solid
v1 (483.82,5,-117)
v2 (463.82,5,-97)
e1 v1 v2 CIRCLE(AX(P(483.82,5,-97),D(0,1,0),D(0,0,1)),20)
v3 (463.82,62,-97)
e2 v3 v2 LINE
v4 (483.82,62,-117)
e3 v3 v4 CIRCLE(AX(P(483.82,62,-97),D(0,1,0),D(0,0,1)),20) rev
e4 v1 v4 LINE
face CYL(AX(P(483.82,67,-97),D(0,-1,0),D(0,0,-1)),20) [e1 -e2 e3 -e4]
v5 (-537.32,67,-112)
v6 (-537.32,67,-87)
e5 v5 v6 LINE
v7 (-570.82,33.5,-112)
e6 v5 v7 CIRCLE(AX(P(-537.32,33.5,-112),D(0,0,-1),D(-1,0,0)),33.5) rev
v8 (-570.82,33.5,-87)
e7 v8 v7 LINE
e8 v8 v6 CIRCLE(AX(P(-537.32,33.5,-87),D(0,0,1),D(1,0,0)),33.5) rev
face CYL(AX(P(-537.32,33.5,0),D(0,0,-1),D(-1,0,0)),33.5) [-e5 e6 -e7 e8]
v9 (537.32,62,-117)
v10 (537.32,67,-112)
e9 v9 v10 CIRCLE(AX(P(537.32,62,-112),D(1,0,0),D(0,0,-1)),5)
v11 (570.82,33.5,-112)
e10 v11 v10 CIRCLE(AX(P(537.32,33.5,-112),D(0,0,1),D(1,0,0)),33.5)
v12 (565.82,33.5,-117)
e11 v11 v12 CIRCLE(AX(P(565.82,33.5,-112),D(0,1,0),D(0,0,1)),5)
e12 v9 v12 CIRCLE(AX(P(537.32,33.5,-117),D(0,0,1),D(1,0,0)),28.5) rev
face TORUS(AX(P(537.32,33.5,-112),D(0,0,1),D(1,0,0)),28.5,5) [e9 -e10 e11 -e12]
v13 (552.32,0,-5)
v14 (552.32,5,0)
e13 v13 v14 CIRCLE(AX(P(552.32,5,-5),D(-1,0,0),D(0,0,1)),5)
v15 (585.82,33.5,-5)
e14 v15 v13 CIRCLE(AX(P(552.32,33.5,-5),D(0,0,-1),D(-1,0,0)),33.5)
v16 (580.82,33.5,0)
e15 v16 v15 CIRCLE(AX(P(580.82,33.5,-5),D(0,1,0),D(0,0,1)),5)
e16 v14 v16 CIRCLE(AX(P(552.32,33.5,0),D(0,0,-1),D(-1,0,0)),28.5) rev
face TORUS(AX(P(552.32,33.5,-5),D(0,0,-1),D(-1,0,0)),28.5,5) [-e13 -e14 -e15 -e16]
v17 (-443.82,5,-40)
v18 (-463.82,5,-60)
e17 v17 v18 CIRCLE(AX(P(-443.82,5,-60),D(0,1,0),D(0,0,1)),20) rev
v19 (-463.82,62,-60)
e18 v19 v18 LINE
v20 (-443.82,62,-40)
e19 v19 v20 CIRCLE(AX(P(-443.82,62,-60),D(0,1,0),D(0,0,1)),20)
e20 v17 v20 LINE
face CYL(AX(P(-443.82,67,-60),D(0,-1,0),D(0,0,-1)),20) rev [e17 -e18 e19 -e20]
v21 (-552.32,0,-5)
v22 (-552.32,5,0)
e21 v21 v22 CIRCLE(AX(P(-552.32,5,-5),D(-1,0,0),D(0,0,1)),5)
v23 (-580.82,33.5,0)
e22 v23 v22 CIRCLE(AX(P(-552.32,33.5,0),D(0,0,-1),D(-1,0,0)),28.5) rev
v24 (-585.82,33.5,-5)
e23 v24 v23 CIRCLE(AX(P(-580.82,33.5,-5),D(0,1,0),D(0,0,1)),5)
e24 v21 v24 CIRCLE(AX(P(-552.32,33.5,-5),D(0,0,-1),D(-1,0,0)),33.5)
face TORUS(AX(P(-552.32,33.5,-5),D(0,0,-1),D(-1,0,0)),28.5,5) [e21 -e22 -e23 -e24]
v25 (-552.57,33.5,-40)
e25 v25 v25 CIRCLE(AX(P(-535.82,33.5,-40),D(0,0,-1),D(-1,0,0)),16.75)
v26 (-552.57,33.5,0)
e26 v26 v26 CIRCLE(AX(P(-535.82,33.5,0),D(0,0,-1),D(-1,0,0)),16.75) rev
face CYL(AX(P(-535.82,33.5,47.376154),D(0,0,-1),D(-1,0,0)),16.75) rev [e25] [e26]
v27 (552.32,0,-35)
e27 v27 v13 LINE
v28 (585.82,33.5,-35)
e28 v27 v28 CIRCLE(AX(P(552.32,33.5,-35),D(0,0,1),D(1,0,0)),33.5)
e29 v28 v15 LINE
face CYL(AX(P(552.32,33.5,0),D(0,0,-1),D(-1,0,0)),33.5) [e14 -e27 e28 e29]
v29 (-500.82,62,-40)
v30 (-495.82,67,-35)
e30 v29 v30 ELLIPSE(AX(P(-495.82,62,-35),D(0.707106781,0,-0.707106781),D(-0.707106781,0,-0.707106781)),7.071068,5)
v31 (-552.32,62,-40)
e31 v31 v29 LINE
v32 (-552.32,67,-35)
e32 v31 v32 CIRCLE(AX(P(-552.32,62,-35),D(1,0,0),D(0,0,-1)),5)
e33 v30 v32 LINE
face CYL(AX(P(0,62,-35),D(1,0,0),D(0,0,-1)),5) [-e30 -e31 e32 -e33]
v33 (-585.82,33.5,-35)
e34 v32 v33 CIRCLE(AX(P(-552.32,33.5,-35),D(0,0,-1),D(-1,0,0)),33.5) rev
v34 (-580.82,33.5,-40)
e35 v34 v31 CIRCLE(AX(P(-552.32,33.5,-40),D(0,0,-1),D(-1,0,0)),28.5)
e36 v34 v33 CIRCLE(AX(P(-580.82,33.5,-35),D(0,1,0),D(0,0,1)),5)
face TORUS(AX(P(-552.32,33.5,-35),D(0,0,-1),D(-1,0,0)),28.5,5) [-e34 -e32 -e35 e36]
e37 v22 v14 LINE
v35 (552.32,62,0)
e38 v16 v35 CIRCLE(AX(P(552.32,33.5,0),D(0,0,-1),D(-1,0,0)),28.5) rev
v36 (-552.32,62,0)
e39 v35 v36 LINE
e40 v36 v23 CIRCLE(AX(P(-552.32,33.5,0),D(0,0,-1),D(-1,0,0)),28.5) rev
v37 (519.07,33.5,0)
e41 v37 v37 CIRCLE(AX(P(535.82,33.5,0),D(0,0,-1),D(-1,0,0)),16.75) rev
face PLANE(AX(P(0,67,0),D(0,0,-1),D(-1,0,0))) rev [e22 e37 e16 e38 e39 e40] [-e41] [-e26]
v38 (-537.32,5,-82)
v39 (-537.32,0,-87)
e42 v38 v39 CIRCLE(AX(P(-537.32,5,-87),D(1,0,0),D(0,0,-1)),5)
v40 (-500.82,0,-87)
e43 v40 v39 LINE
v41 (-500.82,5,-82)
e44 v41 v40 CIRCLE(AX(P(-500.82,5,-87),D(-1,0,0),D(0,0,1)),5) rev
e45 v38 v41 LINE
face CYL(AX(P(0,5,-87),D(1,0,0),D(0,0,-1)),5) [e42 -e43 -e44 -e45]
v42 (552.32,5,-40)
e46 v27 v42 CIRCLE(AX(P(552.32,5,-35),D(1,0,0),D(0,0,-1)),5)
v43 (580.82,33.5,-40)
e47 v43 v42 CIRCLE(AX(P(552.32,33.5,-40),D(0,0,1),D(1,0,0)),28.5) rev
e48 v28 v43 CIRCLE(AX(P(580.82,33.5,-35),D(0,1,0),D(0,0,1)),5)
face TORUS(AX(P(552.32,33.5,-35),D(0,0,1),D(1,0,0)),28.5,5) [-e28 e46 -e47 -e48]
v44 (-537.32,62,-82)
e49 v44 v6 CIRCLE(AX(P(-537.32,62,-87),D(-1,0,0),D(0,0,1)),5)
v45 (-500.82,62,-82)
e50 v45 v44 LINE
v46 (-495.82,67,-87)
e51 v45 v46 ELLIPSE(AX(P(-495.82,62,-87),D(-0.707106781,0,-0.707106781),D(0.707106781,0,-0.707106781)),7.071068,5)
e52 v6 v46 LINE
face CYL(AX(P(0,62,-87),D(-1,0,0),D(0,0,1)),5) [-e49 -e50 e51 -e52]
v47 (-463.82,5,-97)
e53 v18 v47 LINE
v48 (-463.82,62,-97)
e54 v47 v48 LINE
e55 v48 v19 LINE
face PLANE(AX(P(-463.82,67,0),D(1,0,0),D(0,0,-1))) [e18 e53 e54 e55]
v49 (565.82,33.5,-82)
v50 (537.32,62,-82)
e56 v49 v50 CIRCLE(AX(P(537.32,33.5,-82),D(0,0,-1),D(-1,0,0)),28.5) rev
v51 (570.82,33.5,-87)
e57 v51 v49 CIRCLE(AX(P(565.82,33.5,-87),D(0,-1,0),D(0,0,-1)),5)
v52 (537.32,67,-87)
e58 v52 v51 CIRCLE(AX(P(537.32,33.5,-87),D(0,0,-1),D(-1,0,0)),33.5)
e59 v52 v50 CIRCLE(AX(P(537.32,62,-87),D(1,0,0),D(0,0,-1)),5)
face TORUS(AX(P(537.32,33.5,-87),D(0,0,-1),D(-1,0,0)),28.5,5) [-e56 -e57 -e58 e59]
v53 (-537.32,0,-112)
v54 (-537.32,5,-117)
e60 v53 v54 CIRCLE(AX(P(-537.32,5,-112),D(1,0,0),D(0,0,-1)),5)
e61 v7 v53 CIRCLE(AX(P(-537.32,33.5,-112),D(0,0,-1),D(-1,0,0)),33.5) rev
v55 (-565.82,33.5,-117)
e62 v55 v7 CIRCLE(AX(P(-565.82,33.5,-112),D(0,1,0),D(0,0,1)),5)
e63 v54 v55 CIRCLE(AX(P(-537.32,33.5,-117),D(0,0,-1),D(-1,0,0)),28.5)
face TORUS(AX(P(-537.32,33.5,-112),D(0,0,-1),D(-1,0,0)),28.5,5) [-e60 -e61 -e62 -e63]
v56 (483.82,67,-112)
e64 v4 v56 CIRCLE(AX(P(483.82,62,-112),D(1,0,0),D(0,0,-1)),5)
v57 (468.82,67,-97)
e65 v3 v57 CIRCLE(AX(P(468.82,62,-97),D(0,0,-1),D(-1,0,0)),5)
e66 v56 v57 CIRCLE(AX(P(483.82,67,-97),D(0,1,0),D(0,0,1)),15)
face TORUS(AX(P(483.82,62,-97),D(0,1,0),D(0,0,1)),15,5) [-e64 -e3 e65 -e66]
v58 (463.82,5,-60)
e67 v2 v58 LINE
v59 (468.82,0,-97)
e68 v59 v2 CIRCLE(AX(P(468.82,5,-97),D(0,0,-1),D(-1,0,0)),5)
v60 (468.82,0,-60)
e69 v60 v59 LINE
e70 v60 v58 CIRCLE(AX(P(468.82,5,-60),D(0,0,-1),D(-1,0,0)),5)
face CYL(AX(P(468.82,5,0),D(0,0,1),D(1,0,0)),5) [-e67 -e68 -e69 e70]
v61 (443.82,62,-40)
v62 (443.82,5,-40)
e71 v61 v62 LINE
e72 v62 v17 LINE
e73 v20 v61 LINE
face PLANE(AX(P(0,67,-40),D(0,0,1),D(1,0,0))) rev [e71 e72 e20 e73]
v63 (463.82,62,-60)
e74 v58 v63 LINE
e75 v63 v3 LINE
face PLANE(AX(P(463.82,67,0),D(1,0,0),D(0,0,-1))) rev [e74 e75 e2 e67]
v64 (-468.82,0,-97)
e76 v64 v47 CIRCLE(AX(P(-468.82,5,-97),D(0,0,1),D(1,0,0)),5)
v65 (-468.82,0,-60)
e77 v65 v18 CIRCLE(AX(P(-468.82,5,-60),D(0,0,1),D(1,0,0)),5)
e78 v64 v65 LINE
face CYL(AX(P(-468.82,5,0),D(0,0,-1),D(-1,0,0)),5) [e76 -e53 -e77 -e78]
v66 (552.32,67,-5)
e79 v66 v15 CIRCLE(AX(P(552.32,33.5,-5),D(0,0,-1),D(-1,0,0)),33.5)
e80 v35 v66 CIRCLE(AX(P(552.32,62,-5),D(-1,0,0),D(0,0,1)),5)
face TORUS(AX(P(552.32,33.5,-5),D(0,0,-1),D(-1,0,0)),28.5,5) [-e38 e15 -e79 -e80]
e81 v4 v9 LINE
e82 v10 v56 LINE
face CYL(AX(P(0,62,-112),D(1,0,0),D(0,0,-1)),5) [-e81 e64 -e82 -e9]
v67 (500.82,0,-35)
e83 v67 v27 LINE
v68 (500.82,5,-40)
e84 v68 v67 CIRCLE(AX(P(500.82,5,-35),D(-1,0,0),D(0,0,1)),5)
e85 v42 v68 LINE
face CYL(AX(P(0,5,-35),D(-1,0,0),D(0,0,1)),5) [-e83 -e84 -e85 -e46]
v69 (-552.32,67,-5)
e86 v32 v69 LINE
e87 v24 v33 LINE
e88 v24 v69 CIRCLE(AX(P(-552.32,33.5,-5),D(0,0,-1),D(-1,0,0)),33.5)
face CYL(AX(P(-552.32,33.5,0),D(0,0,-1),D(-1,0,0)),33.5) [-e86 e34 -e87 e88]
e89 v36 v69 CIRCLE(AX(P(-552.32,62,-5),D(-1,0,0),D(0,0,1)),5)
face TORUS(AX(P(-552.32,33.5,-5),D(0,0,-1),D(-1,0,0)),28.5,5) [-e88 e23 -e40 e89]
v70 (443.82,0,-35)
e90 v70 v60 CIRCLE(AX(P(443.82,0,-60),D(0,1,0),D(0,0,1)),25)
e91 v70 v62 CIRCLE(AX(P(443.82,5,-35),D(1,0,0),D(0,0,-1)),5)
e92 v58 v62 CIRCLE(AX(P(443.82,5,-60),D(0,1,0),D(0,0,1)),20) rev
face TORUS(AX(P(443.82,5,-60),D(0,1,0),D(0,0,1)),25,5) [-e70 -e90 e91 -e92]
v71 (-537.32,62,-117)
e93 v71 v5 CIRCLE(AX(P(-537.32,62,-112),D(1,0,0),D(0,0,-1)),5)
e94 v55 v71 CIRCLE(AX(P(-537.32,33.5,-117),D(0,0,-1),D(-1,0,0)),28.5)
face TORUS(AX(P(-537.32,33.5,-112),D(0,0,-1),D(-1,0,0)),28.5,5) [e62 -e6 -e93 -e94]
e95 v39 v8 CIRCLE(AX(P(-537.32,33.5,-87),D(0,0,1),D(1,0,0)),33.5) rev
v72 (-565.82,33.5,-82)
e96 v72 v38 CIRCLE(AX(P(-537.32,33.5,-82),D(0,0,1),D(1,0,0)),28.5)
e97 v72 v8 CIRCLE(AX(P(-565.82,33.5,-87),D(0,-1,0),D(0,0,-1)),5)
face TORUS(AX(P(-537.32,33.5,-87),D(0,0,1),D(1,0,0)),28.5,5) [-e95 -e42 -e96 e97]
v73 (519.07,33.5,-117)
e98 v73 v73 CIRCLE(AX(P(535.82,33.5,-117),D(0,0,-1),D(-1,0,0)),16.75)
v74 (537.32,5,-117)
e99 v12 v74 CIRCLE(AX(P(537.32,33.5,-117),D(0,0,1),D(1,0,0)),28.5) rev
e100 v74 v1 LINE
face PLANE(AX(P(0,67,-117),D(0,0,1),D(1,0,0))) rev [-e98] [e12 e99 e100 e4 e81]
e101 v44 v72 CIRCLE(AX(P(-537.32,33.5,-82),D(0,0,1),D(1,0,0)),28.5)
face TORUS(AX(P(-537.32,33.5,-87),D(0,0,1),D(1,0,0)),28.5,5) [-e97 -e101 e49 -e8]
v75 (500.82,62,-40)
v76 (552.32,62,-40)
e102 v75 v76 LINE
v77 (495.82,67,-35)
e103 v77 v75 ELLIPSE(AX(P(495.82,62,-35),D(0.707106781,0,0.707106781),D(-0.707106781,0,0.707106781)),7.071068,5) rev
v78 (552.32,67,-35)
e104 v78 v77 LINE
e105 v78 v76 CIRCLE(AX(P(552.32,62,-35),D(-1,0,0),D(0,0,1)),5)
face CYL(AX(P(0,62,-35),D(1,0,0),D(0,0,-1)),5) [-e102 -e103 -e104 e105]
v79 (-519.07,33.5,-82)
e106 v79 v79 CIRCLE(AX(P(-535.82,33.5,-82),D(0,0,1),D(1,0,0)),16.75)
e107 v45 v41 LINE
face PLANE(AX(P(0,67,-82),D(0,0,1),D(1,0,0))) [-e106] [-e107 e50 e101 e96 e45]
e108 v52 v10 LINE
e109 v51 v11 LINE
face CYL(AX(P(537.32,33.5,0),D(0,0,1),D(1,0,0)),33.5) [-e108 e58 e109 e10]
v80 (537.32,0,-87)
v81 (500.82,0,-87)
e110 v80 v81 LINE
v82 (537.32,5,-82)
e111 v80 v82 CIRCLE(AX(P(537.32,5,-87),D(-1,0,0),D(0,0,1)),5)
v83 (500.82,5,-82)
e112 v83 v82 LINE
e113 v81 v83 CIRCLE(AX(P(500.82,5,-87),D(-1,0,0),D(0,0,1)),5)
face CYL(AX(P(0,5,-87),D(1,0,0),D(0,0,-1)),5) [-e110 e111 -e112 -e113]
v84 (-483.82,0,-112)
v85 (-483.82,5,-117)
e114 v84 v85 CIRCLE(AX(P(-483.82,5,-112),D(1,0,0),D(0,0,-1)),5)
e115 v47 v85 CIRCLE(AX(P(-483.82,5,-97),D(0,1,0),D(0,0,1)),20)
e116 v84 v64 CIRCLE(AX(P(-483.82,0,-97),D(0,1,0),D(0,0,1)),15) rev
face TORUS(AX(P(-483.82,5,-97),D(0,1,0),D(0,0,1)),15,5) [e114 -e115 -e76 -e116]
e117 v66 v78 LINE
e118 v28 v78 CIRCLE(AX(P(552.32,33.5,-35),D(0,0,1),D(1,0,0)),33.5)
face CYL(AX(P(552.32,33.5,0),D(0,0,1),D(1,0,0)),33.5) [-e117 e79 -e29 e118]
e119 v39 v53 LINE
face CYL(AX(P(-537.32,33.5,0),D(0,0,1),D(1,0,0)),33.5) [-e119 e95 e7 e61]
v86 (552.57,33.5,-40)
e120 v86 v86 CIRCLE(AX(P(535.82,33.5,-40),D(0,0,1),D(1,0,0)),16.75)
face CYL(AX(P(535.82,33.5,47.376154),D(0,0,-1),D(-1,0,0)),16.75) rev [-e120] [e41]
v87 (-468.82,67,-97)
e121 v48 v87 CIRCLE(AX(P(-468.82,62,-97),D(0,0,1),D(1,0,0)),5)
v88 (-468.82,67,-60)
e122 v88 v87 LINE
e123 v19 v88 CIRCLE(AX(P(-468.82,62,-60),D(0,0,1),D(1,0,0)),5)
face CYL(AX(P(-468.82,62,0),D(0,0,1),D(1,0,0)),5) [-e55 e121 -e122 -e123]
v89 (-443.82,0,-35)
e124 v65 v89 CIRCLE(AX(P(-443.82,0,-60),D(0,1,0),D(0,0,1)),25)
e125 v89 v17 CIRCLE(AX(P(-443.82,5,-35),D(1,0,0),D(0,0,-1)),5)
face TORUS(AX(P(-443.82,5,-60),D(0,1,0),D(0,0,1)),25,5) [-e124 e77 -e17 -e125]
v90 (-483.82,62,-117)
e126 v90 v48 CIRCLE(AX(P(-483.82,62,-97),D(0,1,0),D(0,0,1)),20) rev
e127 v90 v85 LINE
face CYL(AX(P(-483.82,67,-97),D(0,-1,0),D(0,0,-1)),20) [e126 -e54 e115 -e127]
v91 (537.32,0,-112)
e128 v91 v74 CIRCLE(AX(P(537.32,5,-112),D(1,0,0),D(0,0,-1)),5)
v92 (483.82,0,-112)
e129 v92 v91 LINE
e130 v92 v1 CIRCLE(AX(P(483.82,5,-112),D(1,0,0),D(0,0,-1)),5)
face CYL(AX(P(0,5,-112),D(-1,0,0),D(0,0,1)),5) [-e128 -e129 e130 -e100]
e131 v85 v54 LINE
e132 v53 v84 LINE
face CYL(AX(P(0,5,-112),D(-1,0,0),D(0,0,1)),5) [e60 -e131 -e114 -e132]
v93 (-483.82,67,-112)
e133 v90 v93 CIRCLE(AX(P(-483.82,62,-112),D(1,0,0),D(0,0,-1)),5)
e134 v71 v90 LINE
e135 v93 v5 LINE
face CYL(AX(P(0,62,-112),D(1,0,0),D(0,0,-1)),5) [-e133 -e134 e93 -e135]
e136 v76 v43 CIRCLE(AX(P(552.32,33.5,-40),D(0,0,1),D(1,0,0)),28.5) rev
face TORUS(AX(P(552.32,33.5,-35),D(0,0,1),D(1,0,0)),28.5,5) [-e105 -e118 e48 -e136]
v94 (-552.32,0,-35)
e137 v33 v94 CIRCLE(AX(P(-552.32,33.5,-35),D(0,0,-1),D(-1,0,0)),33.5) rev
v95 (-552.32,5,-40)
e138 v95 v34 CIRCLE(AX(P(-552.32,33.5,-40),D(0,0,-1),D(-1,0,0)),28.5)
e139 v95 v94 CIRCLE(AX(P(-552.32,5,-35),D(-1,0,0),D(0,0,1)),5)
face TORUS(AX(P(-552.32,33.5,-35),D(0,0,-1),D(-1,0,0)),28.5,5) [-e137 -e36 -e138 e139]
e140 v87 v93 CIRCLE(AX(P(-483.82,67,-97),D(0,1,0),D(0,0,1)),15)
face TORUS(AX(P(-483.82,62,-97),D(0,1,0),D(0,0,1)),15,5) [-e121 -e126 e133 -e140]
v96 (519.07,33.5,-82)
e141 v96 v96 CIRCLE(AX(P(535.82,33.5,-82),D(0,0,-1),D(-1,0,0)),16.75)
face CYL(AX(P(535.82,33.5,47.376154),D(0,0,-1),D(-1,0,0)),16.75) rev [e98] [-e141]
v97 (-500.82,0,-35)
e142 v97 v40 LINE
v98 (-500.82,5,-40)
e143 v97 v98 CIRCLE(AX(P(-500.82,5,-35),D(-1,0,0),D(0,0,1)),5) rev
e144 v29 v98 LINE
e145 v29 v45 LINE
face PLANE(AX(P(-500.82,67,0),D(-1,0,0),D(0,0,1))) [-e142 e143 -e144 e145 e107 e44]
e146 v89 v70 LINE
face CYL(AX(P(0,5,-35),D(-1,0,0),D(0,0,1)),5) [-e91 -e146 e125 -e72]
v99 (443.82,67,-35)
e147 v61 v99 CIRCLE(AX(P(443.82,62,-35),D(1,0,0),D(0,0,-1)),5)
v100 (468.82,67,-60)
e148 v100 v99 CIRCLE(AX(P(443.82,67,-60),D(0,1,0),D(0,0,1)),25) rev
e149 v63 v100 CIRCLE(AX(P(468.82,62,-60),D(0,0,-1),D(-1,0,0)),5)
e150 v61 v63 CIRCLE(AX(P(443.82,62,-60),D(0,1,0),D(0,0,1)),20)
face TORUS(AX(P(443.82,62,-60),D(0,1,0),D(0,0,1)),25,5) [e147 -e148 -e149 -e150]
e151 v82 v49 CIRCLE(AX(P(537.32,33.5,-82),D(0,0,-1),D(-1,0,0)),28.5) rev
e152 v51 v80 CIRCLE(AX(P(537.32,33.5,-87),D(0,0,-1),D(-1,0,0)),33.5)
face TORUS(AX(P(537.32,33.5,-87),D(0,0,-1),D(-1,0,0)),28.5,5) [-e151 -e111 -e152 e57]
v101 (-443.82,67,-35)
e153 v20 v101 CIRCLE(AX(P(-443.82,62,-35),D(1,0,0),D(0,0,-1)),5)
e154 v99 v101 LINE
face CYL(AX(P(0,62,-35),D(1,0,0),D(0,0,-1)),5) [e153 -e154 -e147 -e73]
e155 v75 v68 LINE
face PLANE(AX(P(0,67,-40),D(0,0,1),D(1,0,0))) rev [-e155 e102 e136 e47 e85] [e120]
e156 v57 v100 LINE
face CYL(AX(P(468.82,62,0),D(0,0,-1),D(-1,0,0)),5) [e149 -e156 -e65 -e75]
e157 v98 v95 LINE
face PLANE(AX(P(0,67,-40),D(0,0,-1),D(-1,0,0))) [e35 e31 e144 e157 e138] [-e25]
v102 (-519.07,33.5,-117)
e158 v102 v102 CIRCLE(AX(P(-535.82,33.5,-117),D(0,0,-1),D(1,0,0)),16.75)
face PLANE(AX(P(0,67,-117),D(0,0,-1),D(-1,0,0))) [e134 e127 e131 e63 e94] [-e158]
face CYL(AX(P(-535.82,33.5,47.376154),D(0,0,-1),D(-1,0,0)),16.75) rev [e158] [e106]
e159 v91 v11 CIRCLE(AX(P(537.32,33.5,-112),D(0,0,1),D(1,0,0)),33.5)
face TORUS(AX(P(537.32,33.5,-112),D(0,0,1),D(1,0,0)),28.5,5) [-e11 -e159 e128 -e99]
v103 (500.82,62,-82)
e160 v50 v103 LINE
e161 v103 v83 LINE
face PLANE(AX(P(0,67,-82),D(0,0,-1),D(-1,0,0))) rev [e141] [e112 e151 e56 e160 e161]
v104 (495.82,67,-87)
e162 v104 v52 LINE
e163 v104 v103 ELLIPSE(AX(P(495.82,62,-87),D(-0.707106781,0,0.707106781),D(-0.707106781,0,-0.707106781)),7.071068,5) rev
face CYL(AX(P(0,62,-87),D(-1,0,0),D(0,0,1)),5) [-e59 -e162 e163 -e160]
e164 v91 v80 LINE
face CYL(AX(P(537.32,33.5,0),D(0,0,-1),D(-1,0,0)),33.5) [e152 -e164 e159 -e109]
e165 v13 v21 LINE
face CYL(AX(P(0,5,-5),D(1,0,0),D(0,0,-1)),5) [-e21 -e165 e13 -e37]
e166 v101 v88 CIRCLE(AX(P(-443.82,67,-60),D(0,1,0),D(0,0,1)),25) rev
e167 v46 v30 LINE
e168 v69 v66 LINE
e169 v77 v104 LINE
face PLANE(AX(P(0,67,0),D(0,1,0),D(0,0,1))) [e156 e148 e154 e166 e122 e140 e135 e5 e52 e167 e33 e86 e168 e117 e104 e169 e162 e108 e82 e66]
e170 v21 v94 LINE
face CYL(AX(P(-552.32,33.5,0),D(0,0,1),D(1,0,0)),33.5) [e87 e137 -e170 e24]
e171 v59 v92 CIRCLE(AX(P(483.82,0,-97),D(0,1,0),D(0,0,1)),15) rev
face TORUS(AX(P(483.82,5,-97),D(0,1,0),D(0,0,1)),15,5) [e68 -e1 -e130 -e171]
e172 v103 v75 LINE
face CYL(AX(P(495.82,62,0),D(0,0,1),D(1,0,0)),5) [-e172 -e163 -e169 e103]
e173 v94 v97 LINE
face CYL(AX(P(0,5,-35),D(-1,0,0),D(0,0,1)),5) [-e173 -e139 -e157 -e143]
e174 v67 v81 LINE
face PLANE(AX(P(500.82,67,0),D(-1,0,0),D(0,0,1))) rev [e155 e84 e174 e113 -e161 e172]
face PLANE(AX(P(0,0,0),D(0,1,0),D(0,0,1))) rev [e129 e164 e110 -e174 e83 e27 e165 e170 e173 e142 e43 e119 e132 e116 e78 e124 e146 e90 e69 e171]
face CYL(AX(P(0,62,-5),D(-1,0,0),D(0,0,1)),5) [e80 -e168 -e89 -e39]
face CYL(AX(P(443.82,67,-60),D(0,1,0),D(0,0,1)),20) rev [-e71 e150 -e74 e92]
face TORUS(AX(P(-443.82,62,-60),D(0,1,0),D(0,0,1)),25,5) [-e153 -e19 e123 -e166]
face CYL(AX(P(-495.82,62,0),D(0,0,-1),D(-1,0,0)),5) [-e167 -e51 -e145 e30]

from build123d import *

# Parameters (mm, degrees)
Y_KSEKLIK_EKSTR_ZYON1_DEPTH = 67
KES_EKSTR_ZYON1_REACH       = 603.135
IZIM3_R                     = 16.75
RADYUS1_R                   = 20
RADYUS2_R                   = 33.5
RADYUS4_R                   = 5


with BuildPart() as part:
    # Çizim2 → Yükseklik-Ekstrüzyon1 (new body)
    with BuildSketch(Plane(origin=(0, 0, 0), x_dir=(1, 0, 0), z_dir=(0, 1, 0))):
        Polygon((-585.82, 40), (-585.82, 0), (0, 0), (0, 40), (-463.82, 40), (-463.82, 117), (-570.82, 117), (-570.82, 82), (-500.82, 82), (-500.82, 40), align=None)
        Polygon((0, 40), (0, 0), (585.82, 0), (585.82, 40), (500.82, 40), (500.82, 82), (570.82, 82), (570.82, 117), (463.82, 117), (463.82, 40), align=None)
    extrude(amount=Y_KSEKLIK_EKSTR_ZYON1_DEPTH)

    # Kes-Ekstrüzyon1: up to this face of the body (flat: up to its plane)
    kes_ekstr_zyon1_end = Plane(part.part.faces().sort_by_distance((0, 33.5, 0))[0])
    # Çizim3 → Kes-Ekstrüzyon1 (cut, up to the picked face)
    with BuildSketch(Plane(origin=(0, 0, -117), x_dir=(-1, 0, 0), z_dir=(0, 0, -1)), mode=Mode.PRIVATE) as kes_ekstr_zyon1_sk1:
        with Locations((-535.82, 33.5)):
            Circle(IZIM3_R)
    kes_ekstr_zyon1_tool1 = split(extrude(kes_ekstr_zyon1_sk1.sketch, amount=-KES_EKSTR_ZYON1_REACH, mode=Mode.PRIVATE), bisect_by=kes_ekstr_zyon1_end, keep=Keep.BOTH, mode=Mode.PRIVATE)
    # Çizim3 → Kes-Ekstrüzyon1 (cut, up to the picked face)
    with BuildSketch(Plane(origin=(0, 0, -117), x_dir=(-1, 0, 0), z_dir=(0, 0, -1)), mode=Mode.PRIVATE) as kes_ekstr_zyon1_sk2:
        with Locations((535.82, 33.5)):
            Circle(IZIM3_R)
    kes_ekstr_zyon1_tool2 = split(extrude(kes_ekstr_zyon1_sk2.sketch, amount=-KES_EKSTR_ZYON1_REACH, mode=Mode.PRIVATE), bisect_by=kes_ekstr_zyon1_end, keep=Keep.BOTH, mode=Mode.PRIVATE)
    add(kes_ekstr_zyon1_tool1.solids().sort_by(Axis((535.82, 33.5, -117), (0, 0, 1)))[0], mode=Mode.SUBTRACT)
    add(kes_ekstr_zyon1_tool2.solids().sort_by(Axis((-535.82, 33.5, -117), (0, 0, 1)))[0], mode=Mode.SUBTRACT)

    # Radyus1
    radyus1_edges = [part.edges().sort_by_distance(p)[0] for p in [
        (-463.82, 33.5, -117),
        (-463.82, 33.5, -40),
        (463.82, 33.5, -40),
        (463.82, 33.5, -117),
    ]]
    fillet(radyus1_edges, radius=RADYUS1_R)

    # Radyus2
    radyus2_edges = [part.edges().sort_by_distance(p)[0] for p in [
        (-585.82, 0, -20),
        (-585.82, 67, -20),
        (585.82, 0, -20),
        (585.82, 67, -20),
        (570.82, 67, -99.5),
        (570.82, 0, -99.5),
        (-570.82, 0, -99.5),
        (-570.82, 67, -99.5),
    ]]
    fillet(radyus2_edges, radius=RADYUS2_R - 0.0001)  # a hair under: the kernel refuses the full size

    # Radyus4
    radyus4_edges = [part.edges().sort_by_distance(p)[0] for p in [
        (-510.57005, 67, -117),
        (526.57005, 67, -40),
        (576.008106459, 57.188106459, -40),
        (576.008106459, 9.811893541, -40),
        (561.008106459, 9.811893541, -117),
        (561.008106459, 57.188106459, -117),
        (561.008106459, 9.811893541, -82),
        (561.008106459, 57.188106459, -82),
        (-561.008106459, 57.188106459, -117),
        (-561.008106459, 9.811893541, -117),
        (-561.008106459, 57.188106459, -82),
        (-561.008106459, 9.811893541, -82),
        (-519.07005, 0, -82),
        (500.82, 67, -61),
        (519.07005, 0, -82),
        (519.07005, 67, -82),
        (-519.07005, 67, -82),
        (-500.82, 67, -61),
        (463.82, 0, -78.5),
        (463.82, 67, -78.5),
        (-463.82, 0, -78.5),
        (0, 0, -40),
        (-469.677864376, 0, -111.142135624),
        (469.677864376, 0, -111.142135624),
        (0, 67, -40),
        (-463.82, 67, -78.5),
        (-469.677864376, 67, -111.142135624),
        (469.677864376, 67, -111.142135624),
        (457.962135624, 0, -45.857864376),
        (457.962135624, 67, -45.857864376),
        (-457.962135624, 0, -45.857864376),
        (-457.962135624, 67, -45.857864376),
        (510.57005, 0, -117),
        (526.57005, 0, -40),
        (0, 0, 0),
        (-526.57005, 0, -40),
        (-510.57005, 0, -117),
        (-526.57005, 67, -40),
        (-576.008106459, 57.188106459, -40),
        (-576.008106459, 9.811893541, -40),
        (0, 67, 0),
        (576.008106459, 57.188106459, 0),
        (576.008106459, 9.811893541, 0),
        (-576.008106459, 57.188106459, 0),
        (-576.008106459, 9.811893541, 0),
        (510.57005, 67, -117),
    ]]
    fillet(radyus4_edges, radius=RADYUS4_R)


solid = part.part
